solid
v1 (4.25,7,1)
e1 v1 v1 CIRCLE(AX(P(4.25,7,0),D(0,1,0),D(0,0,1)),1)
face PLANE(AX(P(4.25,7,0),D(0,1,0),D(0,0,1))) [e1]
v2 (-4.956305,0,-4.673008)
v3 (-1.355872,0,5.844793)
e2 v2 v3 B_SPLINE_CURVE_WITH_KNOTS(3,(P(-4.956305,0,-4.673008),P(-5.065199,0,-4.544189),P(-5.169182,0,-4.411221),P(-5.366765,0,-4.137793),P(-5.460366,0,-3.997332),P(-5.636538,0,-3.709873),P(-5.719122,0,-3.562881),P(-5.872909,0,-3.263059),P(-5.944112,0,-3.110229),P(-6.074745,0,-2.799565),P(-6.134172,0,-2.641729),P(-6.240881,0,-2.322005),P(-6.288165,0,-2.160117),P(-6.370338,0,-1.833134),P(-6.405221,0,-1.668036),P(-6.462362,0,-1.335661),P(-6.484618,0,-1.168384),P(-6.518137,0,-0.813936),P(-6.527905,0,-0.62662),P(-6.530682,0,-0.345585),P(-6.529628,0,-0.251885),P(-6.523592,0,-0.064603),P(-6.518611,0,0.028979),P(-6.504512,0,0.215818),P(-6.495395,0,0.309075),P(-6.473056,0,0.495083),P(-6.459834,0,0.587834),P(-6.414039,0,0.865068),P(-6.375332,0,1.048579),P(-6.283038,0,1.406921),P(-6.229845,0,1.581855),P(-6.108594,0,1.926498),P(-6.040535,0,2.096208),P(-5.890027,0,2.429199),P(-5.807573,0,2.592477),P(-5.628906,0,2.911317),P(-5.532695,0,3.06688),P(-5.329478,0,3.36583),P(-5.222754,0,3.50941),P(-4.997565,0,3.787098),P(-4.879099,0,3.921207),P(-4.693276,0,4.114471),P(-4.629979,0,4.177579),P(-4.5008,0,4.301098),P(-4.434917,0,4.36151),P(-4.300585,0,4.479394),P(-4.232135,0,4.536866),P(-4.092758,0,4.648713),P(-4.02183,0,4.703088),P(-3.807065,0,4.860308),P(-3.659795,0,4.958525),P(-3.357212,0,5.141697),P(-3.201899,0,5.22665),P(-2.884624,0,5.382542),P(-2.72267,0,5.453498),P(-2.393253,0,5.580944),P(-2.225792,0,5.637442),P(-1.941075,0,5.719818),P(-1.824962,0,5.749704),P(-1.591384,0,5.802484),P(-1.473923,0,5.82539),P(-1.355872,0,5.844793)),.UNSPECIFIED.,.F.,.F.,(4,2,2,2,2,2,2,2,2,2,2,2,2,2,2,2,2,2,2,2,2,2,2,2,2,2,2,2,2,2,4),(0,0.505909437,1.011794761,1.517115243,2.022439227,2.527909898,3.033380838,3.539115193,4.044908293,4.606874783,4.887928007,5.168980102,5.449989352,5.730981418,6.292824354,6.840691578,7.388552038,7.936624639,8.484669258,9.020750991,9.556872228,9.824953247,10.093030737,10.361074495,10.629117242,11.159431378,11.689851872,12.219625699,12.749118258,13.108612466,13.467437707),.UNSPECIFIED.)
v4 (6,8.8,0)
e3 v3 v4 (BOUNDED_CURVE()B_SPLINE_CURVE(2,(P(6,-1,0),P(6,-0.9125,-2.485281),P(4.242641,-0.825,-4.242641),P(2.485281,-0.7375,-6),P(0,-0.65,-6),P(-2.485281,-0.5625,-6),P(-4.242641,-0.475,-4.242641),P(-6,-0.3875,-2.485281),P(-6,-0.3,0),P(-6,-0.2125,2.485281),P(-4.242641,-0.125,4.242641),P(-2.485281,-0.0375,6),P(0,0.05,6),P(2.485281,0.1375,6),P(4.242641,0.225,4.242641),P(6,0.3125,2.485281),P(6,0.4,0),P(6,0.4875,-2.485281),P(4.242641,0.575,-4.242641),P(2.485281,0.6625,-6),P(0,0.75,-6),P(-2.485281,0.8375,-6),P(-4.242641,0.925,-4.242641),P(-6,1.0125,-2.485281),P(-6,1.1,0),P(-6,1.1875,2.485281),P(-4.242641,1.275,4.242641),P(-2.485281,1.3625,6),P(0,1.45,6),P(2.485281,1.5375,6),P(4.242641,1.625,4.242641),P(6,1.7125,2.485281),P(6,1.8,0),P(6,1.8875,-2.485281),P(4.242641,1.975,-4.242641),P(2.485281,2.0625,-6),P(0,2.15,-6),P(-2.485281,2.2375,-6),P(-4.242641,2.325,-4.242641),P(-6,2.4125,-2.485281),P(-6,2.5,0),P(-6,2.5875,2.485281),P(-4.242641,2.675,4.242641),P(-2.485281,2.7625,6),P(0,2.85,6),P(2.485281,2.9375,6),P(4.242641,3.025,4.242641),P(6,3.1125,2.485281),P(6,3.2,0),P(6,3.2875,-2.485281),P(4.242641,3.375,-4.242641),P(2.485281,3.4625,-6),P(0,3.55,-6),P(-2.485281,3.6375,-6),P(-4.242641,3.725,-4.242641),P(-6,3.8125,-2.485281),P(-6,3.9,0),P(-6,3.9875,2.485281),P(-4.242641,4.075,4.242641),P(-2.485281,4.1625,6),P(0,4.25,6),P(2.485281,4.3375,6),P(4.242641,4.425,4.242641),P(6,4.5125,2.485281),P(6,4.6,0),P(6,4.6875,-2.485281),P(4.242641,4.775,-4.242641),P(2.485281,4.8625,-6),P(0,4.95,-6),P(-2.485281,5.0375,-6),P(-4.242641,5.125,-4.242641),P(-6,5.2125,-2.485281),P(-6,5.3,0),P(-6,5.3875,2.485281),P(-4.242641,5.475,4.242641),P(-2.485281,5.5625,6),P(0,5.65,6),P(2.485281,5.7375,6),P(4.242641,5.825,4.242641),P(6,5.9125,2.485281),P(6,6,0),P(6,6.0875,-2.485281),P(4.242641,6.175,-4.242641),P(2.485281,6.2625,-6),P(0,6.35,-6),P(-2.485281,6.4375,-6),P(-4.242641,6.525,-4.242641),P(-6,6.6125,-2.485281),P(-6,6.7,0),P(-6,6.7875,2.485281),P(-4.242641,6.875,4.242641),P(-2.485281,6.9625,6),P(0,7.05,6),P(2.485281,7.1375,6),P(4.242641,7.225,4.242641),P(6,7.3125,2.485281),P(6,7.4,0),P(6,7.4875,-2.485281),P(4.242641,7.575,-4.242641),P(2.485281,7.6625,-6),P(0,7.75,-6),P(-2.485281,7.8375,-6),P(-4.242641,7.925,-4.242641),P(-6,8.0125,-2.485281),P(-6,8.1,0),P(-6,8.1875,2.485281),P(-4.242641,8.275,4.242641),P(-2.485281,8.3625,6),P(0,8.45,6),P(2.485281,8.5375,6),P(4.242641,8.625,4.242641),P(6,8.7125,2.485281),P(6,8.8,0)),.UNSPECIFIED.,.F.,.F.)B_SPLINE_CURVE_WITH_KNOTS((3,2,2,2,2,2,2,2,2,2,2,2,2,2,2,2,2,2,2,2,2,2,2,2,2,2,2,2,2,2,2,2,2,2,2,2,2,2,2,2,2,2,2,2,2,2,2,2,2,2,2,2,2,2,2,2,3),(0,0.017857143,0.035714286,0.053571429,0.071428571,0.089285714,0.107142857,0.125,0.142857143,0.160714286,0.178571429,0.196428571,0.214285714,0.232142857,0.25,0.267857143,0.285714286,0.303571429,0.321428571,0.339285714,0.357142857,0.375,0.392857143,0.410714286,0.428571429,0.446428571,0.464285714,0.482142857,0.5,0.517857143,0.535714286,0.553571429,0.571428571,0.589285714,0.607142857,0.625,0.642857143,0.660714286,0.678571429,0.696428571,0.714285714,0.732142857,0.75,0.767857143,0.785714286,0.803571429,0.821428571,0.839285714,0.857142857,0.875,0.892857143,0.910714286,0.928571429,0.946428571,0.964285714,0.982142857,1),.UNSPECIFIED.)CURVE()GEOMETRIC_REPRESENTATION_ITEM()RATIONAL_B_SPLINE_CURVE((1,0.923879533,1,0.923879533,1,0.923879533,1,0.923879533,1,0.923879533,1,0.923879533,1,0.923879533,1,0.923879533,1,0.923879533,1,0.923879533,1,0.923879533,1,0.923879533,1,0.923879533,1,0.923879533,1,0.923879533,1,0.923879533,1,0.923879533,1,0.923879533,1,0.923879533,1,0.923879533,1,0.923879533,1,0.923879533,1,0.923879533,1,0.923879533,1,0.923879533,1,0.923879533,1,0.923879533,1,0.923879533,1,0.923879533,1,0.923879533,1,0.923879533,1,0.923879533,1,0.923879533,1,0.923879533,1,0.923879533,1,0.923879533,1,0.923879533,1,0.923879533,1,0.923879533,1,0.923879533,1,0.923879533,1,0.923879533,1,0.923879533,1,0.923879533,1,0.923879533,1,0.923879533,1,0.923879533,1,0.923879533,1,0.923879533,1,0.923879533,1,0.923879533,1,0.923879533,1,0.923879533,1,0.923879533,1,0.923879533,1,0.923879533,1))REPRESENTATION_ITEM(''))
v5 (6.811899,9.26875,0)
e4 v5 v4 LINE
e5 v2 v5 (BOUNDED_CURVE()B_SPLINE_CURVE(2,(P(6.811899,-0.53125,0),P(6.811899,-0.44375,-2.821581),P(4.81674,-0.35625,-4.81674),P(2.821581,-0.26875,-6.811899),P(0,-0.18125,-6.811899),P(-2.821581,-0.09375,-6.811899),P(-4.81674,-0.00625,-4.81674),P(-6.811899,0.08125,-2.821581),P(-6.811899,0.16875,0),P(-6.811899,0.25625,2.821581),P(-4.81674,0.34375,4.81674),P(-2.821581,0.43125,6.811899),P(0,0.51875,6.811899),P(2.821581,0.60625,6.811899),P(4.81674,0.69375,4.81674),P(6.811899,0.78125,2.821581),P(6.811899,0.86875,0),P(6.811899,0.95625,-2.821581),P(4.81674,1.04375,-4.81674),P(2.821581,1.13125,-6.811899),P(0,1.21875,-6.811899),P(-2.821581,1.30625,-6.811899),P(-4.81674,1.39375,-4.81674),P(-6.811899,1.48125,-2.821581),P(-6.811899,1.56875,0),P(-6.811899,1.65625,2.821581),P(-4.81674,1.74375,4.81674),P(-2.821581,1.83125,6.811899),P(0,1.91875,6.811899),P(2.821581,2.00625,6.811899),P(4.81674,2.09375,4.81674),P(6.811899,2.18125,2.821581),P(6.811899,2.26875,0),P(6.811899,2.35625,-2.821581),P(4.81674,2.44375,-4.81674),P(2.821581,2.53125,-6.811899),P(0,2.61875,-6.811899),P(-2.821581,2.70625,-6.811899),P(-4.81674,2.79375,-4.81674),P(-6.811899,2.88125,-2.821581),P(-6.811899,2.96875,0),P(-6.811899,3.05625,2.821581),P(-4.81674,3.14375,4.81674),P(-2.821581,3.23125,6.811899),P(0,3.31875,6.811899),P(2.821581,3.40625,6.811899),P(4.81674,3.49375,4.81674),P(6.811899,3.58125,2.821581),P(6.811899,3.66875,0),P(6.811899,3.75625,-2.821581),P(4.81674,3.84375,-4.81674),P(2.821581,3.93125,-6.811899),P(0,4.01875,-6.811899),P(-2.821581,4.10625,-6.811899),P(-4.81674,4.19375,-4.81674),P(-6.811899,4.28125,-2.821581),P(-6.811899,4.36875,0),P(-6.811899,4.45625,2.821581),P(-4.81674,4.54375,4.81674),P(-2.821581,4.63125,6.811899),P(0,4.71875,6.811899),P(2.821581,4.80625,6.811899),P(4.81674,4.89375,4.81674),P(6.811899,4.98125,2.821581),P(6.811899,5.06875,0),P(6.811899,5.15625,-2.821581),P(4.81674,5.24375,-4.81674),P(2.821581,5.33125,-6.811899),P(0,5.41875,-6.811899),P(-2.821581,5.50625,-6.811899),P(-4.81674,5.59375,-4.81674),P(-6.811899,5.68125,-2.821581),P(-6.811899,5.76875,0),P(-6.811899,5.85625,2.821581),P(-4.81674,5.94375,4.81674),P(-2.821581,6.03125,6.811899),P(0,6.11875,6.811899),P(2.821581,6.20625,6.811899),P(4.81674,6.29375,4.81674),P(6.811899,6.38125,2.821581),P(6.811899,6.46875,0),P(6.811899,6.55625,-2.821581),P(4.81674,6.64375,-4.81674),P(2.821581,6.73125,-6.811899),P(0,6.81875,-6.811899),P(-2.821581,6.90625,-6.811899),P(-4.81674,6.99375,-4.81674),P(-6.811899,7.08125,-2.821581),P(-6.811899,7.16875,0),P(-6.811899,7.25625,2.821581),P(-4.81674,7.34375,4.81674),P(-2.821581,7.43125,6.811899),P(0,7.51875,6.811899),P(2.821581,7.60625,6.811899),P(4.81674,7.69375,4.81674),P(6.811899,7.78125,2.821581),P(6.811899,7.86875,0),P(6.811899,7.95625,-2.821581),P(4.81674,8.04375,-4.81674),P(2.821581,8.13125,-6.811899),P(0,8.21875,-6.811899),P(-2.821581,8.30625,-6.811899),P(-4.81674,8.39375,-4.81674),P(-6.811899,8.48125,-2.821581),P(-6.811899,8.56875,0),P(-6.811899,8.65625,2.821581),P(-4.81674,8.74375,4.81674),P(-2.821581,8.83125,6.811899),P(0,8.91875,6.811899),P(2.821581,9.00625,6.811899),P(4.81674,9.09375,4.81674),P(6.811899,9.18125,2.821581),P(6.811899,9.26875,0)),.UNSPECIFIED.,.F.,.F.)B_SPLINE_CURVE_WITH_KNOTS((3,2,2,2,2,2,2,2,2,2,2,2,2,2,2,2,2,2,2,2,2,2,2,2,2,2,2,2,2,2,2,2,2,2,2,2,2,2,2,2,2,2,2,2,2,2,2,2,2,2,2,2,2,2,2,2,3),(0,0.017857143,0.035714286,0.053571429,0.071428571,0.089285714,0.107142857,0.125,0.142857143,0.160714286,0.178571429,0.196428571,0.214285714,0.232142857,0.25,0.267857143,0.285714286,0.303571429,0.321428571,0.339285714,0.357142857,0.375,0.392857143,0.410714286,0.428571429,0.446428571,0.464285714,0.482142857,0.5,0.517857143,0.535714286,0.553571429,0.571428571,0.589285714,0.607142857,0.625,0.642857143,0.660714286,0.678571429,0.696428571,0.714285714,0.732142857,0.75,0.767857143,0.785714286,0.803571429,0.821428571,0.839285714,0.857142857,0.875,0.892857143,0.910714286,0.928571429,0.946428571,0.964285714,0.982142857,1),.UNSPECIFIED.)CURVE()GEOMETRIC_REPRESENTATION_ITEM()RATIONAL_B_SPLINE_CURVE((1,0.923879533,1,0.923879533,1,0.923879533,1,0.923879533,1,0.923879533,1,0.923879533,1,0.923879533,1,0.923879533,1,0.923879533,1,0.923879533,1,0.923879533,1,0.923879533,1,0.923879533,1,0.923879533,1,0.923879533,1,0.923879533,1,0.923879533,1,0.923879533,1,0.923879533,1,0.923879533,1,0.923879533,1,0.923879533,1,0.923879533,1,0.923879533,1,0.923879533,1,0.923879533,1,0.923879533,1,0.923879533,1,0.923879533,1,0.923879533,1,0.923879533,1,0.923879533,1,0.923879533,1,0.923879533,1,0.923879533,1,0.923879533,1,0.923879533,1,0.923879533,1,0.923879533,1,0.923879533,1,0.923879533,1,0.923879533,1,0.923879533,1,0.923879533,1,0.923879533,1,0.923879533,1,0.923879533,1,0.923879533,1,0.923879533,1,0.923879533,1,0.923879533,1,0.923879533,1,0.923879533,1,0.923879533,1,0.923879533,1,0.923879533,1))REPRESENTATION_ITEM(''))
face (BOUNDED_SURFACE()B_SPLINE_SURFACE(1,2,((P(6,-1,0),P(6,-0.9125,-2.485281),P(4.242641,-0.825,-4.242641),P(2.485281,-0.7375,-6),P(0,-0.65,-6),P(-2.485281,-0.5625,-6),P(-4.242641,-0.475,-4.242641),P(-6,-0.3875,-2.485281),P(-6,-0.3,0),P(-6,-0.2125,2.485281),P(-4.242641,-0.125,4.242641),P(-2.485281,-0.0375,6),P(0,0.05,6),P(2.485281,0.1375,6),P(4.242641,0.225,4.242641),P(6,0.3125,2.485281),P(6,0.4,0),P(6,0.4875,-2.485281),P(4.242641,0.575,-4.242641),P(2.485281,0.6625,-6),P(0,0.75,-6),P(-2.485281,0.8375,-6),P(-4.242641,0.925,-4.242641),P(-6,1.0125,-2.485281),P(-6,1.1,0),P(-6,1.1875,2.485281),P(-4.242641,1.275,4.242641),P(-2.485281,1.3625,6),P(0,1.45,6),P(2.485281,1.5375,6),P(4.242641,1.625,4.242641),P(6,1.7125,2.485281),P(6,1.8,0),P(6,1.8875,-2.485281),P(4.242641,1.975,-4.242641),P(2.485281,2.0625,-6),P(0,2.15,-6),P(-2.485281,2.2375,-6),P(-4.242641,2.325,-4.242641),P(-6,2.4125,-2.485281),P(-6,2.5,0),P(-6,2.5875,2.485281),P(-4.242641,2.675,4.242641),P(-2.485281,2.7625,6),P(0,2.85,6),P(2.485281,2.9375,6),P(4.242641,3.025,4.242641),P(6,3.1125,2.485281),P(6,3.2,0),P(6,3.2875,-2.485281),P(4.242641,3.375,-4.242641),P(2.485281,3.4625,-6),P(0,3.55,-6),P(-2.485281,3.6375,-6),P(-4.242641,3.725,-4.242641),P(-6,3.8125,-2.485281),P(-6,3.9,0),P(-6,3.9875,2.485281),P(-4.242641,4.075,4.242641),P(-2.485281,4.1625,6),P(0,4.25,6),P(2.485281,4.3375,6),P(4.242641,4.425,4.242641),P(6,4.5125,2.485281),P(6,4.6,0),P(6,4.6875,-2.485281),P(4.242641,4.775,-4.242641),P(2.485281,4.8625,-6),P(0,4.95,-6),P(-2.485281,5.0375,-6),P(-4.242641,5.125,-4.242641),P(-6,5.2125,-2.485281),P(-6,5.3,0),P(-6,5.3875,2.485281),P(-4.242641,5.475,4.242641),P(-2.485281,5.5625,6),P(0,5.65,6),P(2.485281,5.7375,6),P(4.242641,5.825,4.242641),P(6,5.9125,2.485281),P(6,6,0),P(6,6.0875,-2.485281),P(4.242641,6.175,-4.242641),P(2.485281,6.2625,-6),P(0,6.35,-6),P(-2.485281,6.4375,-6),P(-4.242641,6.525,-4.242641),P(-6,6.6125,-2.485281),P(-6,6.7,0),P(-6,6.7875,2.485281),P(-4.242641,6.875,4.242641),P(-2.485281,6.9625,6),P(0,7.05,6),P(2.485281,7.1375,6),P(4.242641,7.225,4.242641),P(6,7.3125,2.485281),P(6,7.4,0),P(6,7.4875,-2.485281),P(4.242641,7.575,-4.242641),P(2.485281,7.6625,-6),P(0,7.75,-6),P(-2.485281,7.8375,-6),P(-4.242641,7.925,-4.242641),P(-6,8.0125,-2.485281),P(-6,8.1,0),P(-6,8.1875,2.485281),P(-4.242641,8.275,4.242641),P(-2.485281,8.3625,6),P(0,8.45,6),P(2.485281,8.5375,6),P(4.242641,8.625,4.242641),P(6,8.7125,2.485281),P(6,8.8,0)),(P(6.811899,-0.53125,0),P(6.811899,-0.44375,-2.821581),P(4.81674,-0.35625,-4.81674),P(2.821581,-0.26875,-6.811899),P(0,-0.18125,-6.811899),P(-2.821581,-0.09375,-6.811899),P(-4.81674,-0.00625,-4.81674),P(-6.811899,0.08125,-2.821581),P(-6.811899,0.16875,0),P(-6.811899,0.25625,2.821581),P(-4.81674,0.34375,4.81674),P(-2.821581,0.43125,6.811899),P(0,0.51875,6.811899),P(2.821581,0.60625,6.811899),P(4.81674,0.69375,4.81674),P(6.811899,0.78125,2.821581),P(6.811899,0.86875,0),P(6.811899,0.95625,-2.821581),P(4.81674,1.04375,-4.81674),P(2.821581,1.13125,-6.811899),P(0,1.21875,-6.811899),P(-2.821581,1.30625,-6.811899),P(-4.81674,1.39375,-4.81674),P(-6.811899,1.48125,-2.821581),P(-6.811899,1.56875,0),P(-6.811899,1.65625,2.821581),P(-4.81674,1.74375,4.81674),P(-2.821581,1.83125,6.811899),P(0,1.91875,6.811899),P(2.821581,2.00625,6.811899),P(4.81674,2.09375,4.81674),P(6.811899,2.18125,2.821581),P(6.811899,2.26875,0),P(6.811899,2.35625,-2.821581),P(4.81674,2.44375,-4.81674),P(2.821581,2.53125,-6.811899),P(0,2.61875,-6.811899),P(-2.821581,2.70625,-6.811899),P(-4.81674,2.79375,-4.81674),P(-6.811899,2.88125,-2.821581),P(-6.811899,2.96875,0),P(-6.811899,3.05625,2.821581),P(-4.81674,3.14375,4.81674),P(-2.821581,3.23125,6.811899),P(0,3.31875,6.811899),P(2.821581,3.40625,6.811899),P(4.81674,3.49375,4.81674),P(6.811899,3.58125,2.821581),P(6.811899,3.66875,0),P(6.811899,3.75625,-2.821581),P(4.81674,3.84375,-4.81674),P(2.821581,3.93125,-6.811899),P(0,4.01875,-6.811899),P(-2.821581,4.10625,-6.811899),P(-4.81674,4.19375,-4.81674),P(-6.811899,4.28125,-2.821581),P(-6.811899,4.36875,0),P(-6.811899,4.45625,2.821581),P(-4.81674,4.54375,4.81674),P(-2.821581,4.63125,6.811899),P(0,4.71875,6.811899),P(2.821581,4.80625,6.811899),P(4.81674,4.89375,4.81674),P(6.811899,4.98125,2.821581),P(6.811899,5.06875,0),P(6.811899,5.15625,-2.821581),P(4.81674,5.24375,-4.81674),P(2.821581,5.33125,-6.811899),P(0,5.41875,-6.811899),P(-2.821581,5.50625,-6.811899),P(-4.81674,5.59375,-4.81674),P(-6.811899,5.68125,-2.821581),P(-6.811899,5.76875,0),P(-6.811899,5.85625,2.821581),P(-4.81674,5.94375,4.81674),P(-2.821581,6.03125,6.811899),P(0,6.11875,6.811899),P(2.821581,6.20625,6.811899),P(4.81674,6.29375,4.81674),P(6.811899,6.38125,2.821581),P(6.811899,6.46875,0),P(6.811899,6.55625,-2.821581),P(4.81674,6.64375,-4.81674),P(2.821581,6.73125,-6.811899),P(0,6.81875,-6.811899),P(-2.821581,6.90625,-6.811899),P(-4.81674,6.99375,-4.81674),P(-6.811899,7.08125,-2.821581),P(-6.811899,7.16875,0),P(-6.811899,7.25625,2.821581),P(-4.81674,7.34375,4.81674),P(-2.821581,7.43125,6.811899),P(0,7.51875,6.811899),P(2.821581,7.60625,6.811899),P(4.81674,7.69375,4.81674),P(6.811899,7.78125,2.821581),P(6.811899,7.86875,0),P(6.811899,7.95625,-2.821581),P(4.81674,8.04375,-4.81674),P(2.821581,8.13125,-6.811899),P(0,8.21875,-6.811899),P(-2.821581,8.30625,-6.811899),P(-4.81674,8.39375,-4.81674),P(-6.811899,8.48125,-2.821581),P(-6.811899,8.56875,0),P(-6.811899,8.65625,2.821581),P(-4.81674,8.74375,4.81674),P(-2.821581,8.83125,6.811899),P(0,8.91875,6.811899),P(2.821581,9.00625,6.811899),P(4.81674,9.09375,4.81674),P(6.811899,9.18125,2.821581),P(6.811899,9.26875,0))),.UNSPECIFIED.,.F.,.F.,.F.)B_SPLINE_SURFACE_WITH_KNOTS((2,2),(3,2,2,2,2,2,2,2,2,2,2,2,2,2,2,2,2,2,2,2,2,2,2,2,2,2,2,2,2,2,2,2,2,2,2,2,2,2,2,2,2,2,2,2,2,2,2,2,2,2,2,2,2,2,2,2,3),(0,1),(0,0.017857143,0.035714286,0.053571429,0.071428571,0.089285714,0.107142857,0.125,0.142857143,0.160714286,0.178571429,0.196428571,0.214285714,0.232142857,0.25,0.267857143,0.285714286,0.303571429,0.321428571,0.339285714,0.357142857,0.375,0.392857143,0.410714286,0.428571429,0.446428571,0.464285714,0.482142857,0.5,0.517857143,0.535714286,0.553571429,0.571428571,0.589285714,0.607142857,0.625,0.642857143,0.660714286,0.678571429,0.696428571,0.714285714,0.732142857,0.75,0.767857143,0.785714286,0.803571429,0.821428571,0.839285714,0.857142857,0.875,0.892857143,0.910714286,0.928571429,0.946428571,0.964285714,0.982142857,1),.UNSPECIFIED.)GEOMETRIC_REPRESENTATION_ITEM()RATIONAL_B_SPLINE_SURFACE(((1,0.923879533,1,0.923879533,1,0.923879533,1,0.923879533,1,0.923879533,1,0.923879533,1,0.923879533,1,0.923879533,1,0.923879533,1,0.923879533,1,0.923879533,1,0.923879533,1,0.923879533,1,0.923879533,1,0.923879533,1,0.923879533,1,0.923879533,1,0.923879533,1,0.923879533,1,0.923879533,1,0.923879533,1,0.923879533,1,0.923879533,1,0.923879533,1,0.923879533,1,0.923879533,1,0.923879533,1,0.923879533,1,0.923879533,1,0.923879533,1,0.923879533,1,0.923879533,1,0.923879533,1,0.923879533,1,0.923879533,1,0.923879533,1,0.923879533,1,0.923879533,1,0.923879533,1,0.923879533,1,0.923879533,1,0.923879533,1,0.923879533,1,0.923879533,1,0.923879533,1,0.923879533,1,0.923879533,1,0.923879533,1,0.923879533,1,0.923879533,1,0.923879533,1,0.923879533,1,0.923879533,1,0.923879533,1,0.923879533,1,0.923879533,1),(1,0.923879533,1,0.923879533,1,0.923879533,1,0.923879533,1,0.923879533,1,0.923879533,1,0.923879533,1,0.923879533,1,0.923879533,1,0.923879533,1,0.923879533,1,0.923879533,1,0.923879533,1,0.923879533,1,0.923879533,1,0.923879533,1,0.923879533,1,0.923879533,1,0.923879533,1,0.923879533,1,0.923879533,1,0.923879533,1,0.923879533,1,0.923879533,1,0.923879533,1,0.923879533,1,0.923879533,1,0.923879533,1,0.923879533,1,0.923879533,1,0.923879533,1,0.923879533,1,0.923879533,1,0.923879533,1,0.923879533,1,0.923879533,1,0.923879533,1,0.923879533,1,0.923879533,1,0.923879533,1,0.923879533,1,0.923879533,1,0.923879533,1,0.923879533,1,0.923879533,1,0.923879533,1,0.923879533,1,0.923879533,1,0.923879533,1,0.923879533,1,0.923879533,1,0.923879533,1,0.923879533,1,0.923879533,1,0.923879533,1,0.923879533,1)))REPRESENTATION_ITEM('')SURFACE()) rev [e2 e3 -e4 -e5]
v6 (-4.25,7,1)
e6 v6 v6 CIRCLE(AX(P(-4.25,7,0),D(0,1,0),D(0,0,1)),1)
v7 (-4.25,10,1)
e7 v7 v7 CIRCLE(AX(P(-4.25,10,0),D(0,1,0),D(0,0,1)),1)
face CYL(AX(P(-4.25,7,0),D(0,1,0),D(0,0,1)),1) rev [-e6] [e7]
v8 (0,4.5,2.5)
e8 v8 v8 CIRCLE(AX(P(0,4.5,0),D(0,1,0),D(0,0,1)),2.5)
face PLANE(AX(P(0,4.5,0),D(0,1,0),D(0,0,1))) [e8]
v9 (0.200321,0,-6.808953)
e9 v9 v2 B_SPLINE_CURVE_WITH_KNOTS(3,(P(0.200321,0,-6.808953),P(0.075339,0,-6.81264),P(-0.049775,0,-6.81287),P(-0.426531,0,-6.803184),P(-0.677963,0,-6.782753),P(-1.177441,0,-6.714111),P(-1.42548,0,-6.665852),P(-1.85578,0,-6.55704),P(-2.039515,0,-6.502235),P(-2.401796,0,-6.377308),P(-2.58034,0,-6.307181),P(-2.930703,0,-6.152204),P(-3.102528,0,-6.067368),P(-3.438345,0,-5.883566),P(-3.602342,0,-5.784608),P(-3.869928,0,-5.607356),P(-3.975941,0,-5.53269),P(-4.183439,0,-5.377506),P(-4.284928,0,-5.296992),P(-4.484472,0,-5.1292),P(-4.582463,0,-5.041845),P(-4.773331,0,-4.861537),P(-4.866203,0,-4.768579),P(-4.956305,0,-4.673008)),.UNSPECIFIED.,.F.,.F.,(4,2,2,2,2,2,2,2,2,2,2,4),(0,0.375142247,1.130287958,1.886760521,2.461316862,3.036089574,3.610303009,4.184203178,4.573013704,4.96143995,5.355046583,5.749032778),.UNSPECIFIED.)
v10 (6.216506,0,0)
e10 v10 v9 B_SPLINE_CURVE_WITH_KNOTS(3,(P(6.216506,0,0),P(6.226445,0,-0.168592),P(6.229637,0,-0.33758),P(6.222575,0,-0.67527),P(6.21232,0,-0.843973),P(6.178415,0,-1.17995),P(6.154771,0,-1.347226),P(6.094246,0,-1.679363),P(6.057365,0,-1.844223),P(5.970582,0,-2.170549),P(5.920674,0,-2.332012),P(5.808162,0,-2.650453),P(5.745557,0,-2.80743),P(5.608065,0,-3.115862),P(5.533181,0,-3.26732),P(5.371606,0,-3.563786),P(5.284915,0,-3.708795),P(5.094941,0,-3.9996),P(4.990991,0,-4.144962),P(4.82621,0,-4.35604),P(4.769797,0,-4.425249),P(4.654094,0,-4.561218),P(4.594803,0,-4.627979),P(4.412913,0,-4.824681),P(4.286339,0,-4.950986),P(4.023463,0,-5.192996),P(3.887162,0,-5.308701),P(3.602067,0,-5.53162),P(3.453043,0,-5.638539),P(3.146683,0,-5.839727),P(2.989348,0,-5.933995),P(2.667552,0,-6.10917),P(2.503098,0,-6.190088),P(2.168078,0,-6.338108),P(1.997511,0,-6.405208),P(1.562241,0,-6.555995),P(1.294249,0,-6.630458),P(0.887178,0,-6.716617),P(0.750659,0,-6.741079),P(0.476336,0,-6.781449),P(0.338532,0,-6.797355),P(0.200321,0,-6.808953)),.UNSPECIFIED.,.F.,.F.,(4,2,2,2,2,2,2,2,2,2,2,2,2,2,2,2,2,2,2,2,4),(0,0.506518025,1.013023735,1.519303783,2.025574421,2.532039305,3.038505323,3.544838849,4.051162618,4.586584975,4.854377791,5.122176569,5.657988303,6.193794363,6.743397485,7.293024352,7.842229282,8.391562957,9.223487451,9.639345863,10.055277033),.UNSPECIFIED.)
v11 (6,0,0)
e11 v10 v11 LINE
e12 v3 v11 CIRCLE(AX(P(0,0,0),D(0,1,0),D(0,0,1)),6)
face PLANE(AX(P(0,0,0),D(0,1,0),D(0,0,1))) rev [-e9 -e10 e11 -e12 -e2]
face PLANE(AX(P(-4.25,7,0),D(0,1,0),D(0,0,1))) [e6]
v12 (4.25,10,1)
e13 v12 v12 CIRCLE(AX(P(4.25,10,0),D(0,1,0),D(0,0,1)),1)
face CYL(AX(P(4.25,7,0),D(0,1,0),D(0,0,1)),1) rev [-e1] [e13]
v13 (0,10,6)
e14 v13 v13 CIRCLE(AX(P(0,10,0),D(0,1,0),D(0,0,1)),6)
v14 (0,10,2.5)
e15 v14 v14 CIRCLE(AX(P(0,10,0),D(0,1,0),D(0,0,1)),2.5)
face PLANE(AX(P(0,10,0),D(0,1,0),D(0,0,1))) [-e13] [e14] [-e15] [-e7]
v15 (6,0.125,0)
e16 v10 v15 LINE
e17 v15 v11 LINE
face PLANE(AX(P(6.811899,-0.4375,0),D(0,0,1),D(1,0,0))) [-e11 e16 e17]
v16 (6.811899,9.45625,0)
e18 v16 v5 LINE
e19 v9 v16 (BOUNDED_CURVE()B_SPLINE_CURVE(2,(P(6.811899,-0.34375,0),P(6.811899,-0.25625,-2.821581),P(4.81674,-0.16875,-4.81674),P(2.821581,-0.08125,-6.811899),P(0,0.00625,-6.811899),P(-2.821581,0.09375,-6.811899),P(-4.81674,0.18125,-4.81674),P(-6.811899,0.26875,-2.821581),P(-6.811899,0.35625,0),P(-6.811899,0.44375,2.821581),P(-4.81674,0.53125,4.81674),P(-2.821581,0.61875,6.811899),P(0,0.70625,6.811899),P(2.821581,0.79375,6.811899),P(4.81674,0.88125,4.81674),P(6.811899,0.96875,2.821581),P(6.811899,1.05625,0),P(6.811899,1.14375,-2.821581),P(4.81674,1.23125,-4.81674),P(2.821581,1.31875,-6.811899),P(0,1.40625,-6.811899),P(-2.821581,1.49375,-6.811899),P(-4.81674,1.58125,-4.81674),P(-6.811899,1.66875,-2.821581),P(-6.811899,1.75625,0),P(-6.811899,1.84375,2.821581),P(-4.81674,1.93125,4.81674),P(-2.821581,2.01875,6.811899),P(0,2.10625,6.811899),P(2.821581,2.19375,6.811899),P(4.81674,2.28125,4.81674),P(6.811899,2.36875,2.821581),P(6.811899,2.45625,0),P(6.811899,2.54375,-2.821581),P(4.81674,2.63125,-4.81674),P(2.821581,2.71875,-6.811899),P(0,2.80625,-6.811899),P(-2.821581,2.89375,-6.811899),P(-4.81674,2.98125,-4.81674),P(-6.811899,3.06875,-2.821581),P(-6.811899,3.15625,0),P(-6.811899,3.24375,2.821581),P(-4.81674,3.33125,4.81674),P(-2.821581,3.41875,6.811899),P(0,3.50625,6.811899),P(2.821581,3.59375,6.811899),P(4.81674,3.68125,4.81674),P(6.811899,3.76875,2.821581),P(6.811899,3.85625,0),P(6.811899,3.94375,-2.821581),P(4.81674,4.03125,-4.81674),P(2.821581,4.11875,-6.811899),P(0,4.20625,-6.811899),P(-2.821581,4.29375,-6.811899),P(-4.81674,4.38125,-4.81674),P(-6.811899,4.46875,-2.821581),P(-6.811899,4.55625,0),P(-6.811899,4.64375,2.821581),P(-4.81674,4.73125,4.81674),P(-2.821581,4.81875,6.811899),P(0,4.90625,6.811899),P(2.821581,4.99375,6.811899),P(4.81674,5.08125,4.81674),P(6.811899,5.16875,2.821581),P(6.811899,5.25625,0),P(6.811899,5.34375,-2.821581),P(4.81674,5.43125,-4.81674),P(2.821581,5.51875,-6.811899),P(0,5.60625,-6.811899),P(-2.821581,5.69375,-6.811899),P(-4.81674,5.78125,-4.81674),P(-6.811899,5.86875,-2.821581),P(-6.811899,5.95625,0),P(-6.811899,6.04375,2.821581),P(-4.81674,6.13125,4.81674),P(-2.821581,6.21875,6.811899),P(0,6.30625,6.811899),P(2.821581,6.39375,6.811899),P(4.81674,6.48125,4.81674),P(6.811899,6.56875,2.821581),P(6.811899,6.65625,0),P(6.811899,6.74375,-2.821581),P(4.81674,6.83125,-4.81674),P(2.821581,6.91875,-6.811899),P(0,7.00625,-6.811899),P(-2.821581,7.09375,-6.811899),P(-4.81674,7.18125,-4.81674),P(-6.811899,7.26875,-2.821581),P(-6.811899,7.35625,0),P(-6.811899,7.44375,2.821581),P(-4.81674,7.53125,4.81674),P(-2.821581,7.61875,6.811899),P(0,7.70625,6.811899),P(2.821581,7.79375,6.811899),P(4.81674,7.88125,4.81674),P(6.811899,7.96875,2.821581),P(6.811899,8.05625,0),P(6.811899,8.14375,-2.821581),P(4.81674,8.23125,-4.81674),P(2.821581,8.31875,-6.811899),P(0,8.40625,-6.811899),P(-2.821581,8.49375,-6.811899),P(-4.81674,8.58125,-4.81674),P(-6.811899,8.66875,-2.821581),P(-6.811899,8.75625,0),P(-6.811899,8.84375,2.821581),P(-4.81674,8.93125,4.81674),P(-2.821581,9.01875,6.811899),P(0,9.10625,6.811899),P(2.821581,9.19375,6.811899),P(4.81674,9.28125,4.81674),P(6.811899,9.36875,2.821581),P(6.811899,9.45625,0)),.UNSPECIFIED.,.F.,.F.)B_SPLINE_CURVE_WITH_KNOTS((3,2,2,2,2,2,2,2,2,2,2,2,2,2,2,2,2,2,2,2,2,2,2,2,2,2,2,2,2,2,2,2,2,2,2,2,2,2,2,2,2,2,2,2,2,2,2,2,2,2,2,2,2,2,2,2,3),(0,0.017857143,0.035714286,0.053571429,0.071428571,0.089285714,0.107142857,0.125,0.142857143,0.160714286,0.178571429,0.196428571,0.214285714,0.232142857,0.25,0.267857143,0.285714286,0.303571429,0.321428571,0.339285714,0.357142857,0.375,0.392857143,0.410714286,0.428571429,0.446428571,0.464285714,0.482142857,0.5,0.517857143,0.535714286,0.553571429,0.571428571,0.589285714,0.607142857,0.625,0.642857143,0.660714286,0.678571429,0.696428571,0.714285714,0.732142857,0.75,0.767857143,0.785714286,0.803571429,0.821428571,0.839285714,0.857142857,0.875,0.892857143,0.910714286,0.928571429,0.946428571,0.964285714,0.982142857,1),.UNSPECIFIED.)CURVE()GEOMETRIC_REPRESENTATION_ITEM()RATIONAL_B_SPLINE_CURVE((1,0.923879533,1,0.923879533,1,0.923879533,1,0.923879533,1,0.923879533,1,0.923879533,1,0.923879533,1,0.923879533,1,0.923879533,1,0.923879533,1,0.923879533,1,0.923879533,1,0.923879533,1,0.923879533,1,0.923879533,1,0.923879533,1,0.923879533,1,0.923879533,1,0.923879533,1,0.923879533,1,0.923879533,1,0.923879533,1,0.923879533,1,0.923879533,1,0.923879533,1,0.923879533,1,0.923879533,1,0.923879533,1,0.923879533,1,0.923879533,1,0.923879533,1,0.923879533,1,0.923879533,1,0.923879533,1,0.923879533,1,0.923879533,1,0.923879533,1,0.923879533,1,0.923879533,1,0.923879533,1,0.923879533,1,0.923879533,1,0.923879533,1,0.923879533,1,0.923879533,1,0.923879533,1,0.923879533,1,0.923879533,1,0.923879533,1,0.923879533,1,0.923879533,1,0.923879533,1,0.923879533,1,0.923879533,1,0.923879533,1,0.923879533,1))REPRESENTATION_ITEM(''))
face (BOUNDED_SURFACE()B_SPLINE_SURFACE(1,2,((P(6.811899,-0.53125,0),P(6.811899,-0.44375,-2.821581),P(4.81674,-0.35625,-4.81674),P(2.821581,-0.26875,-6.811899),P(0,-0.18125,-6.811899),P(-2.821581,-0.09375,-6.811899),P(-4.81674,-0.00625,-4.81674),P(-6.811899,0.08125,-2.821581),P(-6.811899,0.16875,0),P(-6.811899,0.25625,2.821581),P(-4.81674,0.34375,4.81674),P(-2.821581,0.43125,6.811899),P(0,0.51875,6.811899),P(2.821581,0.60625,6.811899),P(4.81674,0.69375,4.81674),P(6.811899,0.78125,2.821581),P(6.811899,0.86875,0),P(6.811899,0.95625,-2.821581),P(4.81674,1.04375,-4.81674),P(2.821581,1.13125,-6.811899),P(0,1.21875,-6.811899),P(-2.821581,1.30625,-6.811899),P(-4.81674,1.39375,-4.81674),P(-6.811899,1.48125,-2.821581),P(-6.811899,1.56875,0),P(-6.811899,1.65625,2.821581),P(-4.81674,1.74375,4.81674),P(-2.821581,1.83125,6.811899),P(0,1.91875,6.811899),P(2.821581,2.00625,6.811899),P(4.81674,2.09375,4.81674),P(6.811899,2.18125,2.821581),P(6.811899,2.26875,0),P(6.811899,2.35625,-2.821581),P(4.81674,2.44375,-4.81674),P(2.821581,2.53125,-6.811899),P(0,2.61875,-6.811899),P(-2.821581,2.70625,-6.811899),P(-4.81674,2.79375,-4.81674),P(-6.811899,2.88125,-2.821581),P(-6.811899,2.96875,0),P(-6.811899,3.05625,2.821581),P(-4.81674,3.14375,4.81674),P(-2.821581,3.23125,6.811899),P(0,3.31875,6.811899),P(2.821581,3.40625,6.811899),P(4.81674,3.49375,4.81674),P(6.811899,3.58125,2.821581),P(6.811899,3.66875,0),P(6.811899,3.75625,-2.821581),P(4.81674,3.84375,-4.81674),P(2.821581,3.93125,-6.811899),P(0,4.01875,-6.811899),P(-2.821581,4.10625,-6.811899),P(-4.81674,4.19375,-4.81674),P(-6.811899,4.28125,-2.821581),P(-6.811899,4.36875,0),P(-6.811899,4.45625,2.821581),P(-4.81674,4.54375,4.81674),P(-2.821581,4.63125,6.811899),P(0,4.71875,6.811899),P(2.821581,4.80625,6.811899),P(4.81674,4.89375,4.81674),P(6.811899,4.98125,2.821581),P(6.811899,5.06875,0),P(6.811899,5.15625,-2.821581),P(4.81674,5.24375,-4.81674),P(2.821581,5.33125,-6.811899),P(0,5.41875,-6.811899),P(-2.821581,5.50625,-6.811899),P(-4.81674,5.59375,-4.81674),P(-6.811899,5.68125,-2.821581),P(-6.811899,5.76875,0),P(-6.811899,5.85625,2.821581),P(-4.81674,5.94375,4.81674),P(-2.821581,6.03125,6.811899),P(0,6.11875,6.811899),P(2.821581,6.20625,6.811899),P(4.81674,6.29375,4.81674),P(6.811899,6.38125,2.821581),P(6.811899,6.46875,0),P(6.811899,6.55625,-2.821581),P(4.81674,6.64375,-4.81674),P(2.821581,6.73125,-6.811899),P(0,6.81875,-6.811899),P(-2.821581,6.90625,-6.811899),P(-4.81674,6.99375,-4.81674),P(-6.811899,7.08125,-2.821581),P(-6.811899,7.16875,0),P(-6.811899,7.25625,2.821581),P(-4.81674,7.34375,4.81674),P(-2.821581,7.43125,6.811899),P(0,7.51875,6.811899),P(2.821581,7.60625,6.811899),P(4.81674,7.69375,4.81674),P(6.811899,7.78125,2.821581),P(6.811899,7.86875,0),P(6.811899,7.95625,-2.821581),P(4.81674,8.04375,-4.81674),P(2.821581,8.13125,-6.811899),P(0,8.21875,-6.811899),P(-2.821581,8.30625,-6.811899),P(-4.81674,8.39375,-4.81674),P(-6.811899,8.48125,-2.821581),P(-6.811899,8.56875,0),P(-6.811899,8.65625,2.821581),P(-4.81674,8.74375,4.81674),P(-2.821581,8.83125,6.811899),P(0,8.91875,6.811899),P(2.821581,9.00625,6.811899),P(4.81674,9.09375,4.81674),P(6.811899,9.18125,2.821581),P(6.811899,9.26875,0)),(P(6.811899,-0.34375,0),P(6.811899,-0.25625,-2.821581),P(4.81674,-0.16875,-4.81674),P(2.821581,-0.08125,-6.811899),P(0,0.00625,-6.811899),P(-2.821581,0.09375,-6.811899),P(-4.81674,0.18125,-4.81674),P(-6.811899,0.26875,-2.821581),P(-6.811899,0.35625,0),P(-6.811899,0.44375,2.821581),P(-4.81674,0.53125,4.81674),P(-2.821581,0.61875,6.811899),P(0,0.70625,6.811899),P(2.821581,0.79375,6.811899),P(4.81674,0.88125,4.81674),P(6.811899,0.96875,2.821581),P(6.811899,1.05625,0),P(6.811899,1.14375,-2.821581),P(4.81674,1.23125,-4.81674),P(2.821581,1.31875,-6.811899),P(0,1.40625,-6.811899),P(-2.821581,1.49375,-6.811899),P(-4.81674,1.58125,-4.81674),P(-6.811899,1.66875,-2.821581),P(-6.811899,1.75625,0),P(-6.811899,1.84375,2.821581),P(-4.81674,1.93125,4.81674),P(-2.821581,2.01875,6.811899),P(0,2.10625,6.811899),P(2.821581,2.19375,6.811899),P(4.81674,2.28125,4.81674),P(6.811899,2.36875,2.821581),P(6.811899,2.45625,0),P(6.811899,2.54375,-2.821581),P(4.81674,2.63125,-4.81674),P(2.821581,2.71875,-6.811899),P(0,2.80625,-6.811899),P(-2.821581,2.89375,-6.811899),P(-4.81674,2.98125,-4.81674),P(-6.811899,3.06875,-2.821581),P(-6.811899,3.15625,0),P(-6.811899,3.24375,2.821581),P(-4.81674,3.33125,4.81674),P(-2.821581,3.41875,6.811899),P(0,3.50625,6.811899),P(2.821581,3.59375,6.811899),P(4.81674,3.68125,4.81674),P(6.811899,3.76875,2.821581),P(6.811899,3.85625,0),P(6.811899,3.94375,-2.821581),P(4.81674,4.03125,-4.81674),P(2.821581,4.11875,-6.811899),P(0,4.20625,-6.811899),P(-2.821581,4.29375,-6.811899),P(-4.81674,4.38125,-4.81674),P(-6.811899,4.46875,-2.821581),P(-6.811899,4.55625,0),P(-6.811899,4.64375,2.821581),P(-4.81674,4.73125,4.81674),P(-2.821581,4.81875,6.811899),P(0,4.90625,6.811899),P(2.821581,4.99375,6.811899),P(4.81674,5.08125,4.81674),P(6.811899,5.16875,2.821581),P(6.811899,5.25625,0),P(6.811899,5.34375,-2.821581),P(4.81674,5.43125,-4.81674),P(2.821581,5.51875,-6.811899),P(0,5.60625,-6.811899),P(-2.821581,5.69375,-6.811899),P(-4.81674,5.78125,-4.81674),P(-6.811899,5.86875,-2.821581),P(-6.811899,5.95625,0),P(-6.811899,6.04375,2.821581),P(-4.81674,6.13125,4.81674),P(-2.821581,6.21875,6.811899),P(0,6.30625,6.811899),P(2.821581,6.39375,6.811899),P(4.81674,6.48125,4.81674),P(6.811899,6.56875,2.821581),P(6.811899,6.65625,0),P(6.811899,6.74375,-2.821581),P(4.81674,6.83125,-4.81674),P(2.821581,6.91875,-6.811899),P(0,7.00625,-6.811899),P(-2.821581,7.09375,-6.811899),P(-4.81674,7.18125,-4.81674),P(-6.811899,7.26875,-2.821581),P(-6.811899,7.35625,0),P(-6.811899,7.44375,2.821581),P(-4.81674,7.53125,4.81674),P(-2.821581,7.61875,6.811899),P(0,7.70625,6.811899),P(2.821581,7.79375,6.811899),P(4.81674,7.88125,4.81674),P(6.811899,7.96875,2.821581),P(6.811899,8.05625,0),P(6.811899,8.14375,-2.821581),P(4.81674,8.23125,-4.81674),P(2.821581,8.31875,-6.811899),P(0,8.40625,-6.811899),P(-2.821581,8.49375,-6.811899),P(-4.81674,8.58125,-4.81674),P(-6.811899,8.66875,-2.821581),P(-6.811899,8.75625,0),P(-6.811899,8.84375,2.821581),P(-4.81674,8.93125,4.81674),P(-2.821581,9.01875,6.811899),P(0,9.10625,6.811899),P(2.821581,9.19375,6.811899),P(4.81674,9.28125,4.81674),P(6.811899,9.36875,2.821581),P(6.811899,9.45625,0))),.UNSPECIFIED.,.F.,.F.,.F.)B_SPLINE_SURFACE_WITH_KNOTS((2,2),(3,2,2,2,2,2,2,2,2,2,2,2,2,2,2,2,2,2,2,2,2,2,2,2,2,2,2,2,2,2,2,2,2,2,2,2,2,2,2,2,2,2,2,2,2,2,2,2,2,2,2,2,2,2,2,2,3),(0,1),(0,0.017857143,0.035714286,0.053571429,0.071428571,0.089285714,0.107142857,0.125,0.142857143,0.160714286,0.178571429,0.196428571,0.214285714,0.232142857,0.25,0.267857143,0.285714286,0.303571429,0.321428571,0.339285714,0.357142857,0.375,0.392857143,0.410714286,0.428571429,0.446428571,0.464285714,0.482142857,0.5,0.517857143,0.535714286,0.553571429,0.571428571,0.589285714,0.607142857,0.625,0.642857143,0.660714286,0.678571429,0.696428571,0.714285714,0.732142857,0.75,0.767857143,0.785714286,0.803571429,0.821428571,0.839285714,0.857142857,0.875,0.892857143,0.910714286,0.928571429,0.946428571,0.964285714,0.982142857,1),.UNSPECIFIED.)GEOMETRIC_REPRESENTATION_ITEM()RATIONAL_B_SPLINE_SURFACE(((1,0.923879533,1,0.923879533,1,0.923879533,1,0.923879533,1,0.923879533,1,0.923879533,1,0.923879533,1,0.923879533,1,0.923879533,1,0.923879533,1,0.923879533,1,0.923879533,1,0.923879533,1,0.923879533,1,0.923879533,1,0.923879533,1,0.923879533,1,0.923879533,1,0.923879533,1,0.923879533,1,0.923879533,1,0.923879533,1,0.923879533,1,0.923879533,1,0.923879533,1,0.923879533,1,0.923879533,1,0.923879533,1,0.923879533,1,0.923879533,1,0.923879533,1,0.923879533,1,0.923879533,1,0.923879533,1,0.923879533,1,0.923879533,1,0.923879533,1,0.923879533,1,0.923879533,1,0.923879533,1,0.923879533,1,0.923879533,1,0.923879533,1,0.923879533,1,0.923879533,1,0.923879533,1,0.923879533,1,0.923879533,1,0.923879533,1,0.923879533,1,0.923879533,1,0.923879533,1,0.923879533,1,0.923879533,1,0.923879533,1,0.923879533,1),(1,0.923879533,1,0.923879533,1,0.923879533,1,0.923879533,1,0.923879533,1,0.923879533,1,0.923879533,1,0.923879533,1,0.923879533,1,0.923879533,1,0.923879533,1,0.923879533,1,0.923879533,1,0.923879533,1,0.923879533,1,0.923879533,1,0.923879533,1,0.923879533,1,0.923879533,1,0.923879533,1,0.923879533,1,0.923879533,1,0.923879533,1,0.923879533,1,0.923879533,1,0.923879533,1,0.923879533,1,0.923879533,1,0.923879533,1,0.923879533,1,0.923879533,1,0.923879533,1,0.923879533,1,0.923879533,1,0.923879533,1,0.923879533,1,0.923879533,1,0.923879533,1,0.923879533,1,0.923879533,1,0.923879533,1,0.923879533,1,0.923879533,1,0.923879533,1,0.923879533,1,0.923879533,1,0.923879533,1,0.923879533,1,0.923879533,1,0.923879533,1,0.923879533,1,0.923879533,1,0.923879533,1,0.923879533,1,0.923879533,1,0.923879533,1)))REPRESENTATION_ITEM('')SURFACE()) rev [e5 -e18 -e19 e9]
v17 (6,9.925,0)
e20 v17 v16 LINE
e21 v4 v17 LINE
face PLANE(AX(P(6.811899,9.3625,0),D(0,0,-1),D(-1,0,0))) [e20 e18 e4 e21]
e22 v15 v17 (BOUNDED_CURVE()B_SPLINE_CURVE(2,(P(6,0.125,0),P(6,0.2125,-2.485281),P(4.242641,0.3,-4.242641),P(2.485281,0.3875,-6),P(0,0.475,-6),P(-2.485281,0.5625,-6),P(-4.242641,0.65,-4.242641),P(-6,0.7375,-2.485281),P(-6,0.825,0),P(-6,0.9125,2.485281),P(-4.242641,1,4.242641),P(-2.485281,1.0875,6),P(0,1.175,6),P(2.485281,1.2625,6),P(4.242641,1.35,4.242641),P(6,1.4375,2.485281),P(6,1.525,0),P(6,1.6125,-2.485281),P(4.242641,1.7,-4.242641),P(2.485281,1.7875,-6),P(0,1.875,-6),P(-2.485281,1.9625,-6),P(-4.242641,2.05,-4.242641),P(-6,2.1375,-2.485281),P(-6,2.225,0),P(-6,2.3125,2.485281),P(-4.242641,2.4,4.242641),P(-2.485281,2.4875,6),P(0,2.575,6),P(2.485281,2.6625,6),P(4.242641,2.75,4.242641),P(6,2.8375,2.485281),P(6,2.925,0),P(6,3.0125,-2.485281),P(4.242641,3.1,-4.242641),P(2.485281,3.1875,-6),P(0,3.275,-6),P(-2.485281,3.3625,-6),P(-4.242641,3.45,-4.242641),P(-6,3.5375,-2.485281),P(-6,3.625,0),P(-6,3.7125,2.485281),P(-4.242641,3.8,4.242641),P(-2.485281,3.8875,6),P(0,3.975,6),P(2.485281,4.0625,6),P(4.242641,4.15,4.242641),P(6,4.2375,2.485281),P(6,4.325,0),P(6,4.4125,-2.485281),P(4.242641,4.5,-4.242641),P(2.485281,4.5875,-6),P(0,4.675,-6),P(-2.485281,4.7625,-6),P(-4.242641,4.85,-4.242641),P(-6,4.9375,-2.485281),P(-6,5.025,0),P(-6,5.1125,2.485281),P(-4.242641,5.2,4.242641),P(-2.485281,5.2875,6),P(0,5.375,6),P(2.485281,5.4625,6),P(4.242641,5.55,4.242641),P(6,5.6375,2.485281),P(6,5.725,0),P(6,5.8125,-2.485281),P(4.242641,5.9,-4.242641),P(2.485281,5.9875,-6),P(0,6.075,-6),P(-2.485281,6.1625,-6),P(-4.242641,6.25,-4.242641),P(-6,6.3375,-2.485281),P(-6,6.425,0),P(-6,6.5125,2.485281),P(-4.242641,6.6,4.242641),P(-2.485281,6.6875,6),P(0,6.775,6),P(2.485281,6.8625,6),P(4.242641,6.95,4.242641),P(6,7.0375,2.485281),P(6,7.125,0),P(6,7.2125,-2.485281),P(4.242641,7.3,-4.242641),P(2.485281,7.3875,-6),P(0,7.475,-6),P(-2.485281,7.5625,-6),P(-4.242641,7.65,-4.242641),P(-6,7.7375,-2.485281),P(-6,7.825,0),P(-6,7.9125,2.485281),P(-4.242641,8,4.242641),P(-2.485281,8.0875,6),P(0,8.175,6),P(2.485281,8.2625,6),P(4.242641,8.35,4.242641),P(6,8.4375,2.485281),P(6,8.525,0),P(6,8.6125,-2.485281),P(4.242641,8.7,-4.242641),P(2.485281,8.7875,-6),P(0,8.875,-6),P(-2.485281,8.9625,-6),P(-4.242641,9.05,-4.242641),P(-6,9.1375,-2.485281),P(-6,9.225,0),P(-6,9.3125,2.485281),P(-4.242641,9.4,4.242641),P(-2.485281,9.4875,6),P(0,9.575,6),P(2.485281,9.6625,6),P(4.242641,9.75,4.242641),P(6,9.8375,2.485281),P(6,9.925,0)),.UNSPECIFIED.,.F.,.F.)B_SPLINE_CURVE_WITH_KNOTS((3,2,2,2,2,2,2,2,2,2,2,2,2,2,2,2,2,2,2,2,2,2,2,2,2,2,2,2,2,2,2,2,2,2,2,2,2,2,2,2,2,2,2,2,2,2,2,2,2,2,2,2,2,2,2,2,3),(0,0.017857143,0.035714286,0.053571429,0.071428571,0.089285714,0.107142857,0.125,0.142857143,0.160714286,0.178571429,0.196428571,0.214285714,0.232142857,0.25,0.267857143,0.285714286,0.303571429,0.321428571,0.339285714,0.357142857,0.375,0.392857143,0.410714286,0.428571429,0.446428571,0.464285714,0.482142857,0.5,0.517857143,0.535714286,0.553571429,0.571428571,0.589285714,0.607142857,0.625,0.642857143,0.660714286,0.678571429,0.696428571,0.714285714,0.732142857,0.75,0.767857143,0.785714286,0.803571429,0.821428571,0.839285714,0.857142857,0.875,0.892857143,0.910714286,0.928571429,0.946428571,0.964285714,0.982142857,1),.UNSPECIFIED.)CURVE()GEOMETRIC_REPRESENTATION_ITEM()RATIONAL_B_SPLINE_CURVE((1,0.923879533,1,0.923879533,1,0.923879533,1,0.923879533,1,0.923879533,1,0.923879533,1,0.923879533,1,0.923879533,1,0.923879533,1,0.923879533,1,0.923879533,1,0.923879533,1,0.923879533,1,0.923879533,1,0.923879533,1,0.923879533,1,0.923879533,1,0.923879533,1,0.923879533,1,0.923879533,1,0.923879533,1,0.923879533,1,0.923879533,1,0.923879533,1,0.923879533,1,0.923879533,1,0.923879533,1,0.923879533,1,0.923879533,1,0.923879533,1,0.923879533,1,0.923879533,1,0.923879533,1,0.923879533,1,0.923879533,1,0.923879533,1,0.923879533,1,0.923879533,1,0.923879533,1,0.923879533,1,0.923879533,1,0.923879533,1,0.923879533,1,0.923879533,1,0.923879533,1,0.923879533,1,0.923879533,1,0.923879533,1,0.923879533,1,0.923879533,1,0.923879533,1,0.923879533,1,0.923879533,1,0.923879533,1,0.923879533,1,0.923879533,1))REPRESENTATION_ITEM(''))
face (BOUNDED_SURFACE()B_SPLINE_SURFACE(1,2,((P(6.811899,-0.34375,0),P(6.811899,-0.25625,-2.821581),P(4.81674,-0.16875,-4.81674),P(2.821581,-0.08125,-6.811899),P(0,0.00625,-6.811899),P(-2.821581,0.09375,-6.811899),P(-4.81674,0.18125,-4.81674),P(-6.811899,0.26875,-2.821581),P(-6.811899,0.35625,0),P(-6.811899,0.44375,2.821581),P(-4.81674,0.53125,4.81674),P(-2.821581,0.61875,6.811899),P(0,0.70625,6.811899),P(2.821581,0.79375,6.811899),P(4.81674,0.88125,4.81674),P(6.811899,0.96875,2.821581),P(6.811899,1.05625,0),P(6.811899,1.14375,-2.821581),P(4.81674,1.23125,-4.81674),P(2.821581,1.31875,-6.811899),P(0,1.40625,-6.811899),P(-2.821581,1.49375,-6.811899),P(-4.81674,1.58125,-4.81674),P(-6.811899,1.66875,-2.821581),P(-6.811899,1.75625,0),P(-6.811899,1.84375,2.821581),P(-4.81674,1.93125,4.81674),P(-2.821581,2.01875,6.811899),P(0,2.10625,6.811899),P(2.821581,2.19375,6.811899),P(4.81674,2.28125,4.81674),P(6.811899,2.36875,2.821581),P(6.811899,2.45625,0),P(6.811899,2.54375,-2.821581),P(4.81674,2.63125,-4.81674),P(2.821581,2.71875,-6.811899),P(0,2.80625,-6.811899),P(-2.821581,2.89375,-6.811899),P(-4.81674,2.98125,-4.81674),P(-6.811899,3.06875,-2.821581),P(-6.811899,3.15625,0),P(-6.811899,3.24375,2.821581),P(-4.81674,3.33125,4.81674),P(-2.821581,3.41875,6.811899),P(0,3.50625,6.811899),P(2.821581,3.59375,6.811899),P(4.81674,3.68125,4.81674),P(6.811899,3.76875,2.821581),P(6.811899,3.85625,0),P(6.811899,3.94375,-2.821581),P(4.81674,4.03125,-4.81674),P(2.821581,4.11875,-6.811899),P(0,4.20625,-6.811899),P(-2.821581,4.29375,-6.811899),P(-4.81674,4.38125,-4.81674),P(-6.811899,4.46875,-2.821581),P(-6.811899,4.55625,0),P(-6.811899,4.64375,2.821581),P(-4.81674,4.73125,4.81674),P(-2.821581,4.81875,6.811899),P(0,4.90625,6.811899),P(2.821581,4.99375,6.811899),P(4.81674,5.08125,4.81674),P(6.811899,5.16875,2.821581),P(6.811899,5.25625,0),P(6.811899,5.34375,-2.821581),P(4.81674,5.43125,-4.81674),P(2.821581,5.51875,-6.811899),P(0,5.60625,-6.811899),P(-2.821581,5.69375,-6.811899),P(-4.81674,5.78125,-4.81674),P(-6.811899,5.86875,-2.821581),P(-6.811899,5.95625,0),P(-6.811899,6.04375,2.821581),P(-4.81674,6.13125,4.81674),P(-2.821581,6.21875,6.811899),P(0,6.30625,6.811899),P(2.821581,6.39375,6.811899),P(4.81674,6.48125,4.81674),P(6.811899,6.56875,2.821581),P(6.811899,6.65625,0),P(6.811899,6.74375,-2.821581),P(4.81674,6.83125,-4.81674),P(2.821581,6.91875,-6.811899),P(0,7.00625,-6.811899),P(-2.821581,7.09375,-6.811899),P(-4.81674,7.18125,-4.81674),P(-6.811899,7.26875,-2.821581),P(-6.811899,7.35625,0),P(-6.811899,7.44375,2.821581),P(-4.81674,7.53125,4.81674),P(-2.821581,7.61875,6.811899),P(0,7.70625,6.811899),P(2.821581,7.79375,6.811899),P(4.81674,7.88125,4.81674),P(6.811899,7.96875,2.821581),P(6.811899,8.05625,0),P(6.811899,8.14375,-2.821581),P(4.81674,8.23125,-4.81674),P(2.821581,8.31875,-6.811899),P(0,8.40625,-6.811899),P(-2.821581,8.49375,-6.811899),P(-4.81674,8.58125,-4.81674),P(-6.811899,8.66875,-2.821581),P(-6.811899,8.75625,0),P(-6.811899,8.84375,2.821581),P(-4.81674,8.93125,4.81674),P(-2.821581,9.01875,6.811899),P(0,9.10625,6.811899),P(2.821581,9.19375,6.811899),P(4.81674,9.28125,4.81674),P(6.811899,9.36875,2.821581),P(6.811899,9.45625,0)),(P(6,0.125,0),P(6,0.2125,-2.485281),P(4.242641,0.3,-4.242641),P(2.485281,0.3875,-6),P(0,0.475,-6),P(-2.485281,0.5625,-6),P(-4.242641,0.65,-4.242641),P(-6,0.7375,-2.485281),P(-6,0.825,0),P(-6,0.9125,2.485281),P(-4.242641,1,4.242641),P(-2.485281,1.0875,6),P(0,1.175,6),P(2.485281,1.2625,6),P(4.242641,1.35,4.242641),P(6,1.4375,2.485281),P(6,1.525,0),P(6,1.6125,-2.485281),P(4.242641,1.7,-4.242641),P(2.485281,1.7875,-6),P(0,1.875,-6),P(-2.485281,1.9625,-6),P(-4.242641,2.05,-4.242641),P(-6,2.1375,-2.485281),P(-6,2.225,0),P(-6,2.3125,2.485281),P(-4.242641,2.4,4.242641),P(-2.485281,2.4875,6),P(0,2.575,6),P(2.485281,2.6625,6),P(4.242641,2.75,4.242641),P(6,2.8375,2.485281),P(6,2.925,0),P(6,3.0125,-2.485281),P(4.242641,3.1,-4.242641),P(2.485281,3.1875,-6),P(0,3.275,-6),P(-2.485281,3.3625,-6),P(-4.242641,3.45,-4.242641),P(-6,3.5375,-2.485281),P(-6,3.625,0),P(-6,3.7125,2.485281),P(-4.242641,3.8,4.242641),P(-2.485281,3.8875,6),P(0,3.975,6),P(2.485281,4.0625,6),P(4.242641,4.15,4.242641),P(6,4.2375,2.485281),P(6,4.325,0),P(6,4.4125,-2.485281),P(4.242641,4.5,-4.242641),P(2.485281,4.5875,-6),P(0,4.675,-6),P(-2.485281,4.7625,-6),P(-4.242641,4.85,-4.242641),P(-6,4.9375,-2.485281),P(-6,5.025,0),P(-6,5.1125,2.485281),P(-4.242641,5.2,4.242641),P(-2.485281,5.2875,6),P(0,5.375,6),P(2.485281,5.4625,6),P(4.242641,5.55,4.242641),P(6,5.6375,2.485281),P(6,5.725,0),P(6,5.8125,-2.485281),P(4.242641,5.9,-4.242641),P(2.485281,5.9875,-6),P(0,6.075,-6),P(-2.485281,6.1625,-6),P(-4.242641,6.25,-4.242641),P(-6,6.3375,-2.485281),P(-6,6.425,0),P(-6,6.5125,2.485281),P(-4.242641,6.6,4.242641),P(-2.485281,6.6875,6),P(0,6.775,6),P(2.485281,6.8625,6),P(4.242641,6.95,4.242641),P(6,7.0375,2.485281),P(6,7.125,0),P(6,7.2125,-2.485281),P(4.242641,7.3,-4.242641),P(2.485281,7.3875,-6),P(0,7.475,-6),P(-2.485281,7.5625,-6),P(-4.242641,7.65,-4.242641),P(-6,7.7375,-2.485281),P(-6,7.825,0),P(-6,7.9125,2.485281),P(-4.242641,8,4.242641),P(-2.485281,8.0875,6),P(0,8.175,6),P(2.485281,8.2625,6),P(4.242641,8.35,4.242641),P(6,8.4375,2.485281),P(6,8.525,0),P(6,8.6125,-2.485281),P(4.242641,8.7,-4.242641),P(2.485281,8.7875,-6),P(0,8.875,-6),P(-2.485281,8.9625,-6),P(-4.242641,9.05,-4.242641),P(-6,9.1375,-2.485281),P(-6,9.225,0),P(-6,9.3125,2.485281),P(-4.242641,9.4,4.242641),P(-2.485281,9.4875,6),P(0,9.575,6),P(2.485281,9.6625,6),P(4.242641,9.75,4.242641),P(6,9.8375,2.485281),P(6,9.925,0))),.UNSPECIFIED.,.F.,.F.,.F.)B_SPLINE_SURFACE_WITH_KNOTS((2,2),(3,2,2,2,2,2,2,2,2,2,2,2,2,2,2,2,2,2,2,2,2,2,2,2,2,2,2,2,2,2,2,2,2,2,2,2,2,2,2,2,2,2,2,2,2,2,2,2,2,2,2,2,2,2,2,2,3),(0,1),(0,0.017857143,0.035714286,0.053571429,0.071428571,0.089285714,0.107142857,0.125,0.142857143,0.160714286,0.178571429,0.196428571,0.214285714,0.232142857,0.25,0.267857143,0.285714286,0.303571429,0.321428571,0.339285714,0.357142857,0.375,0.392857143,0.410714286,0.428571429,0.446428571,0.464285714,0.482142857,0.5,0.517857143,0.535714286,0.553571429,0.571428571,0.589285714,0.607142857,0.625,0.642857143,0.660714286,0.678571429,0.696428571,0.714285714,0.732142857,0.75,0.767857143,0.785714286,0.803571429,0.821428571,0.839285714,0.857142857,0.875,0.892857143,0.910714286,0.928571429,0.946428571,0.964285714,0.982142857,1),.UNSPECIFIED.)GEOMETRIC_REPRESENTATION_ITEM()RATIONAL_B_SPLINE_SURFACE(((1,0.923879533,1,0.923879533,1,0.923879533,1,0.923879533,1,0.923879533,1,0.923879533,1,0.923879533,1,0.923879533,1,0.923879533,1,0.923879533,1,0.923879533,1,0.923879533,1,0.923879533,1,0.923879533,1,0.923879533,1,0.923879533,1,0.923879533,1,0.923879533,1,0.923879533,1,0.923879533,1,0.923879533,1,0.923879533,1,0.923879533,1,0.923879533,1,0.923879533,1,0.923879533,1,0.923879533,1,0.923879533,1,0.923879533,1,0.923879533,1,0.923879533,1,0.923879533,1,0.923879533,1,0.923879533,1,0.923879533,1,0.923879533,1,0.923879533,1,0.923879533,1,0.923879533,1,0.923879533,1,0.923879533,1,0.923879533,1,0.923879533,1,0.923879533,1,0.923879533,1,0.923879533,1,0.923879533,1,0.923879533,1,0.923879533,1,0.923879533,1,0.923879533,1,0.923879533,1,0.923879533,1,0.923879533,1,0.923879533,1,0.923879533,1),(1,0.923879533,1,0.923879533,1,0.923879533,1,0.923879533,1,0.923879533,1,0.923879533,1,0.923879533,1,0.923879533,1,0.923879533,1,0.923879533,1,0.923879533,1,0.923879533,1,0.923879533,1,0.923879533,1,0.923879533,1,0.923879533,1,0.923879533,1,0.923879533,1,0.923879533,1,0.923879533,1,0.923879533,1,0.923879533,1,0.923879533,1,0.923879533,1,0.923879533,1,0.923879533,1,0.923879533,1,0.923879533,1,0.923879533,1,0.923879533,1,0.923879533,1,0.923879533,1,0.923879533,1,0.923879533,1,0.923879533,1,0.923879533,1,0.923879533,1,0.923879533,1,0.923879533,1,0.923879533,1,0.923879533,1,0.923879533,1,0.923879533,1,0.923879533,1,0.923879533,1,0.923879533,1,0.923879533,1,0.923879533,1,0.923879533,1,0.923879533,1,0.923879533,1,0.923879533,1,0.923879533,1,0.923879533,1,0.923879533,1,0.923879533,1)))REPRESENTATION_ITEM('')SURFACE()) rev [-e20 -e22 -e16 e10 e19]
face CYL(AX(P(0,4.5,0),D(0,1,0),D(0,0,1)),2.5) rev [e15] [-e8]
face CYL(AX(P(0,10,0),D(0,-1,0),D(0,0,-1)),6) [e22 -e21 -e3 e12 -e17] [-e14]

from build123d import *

# Parameters (mm, degrees)
ESQUISSE1_R             = 6
BOSS_EXTRU_1_DEPTH      = 10
FILETAGE1_PITCH         = 1.4
FILETAGE1_FROM          = 1
ESQUISSE23_R            = 2.5
ENL_V_MAT_EXTRU_1_DEPTH = 5.5
ESQUISSE24_R            = 1
ENL_V_MAT_EXTRU_2_DEPTH = 3


with BuildPart() as part:
    # Esquisse1 → Boss.-Extru.1 (new body)
    with BuildSketch(Plane(origin=(0, 0, 0), x_dir=(1, 0, 0), z_dir=(0, 1, 0))):
        with Locations(Location((0, 0, 0), (0, 0, 270))):
            Circle(ESQUISSE1_R)
    extrude(amount=BOSS_EXTRU_1_DEPTH)

    # Filetage1: arcs per turn and ends read off the stored shape
    # Filetage1: the profile of Profil de filetage2 profile screwed along a right-hand helix through 7 turns, 8 arcs to a turn; built about Z, then put on its axis
    filetage1_z = Axis((0, 0, 0), (0, 0, 1))
    filetage1_corners = [(5.9997, 0, -0.000173205), (6.811898812, 0, 0.468749998), (6.811898812, 0, 0.656249998), (5.9997, 0, 1.125173201)]
    with BuildLine(mode=Mode.PRIVATE) as filetage1_profile:
        Line(filetage1_corners[0], filetage1_corners[1])
        Line(filetage1_corners[1], filetage1_corners[2])
        Line(filetage1_corners[2], filetage1_corners[3])
        Line(filetage1_corners[3], filetage1_corners[0])
    filetage1_cap = Face(filetage1_profile.wire())
    filetage1_turn_angles = [0, 22.5, 45, 67.5, 90, 112.5, 135, 157.5, 180, 202.5, 225, 247.5, 270, 292.5, 315, 337.5, 360]
    filetage1_turn_weights = [1, 0.9238795325112867, 1, 0.9238795325112867, 1, 0.9238795325112867, 1, 0.9238795325112867, 1, 0.9238795325112867, 1, 0.9238795325112867, 1, 0.9238795325112867, 1, 0.9238795325112867, 1]
    filetage1_turn_rails = [Edge.make_bspline([Vector(p[0], p[1], 0).rotate(filetage1_z, filetage1_turn_angles[k]) / filetage1_turn_weights[k] + Vector(0, 0, p[2] + FILETAGE1_PITCH * filetage1_turn_angles[k] / 360) for k in range(17)], [0, 0, 0, 1, 1, 2, 2, 3, 3, 4, 4, 5, 5, 6, 6, 7, 7, 8, 8, 8], 2, filetage1_turn_weights) for p in filetage1_corners]
    filetage1_turn_sides = [Face.make_surface_from_curves(filetage1_turn_rails[p[0]], filetage1_turn_rails[p[1]]) for p in [(0, 1), (1, 2), (2, 3), (3, 0)]]
    filetage1 = Plane(origin=(0, -1, 0), x_dir=(1, 0, 0), z_dir=(0, 1, 0)) * split(Solid(Shell([*[p.moved(Location((0, 0, FILETAGE1_PITCH * i))) for i in range(7) for p in filetage1_turn_sides], filetage1_cap, filetage1_cap.rotate(filetage1_z, 2520).moved(Location((0, 0, FILETAGE1_PITCH * 2520 / 360)))])), bisect_by=Plane.XY.offset(FILETAGE1_FROM), keep=Keep.TOP, mode=Mode.PRIVATE)
    add(filetage1)

    # Esquisse23 → Enlèv. mat.-Extru.1 (cut)
    with BuildSketch(Plane(origin=(0, 10, 0), x_dir=(1, 0, 0), z_dir=(0, 1, 0))):
        with Locations(Location((0, 0, 0), (0, 0, 270))):
            Circle(ESQUISSE23_R)
    extrude(amount=-ENL_V_MAT_EXTRU_1_DEPTH, mode=Mode.SUBTRACT)

    # Esquisse24 → Enlèv. mat.-Extru.2 (cut)
    with BuildSketch(Plane(origin=(0, 10, 0), x_dir=(1, 0, 0), z_dir=(0, 1, 0))):
        with Locations(Location((4.25, 0, 0), (0, 0, 270))):
            Circle(ESQUISSE24_R)
        with Locations(Location((-4.25, 0, 0), (0, 0, 270))):
            Circle(ESQUISSE24_R)
    extrude(amount=-ENL_V_MAT_EXTRU_2_DEPTH, mode=Mode.SUBTRACT)


solid = part.part
